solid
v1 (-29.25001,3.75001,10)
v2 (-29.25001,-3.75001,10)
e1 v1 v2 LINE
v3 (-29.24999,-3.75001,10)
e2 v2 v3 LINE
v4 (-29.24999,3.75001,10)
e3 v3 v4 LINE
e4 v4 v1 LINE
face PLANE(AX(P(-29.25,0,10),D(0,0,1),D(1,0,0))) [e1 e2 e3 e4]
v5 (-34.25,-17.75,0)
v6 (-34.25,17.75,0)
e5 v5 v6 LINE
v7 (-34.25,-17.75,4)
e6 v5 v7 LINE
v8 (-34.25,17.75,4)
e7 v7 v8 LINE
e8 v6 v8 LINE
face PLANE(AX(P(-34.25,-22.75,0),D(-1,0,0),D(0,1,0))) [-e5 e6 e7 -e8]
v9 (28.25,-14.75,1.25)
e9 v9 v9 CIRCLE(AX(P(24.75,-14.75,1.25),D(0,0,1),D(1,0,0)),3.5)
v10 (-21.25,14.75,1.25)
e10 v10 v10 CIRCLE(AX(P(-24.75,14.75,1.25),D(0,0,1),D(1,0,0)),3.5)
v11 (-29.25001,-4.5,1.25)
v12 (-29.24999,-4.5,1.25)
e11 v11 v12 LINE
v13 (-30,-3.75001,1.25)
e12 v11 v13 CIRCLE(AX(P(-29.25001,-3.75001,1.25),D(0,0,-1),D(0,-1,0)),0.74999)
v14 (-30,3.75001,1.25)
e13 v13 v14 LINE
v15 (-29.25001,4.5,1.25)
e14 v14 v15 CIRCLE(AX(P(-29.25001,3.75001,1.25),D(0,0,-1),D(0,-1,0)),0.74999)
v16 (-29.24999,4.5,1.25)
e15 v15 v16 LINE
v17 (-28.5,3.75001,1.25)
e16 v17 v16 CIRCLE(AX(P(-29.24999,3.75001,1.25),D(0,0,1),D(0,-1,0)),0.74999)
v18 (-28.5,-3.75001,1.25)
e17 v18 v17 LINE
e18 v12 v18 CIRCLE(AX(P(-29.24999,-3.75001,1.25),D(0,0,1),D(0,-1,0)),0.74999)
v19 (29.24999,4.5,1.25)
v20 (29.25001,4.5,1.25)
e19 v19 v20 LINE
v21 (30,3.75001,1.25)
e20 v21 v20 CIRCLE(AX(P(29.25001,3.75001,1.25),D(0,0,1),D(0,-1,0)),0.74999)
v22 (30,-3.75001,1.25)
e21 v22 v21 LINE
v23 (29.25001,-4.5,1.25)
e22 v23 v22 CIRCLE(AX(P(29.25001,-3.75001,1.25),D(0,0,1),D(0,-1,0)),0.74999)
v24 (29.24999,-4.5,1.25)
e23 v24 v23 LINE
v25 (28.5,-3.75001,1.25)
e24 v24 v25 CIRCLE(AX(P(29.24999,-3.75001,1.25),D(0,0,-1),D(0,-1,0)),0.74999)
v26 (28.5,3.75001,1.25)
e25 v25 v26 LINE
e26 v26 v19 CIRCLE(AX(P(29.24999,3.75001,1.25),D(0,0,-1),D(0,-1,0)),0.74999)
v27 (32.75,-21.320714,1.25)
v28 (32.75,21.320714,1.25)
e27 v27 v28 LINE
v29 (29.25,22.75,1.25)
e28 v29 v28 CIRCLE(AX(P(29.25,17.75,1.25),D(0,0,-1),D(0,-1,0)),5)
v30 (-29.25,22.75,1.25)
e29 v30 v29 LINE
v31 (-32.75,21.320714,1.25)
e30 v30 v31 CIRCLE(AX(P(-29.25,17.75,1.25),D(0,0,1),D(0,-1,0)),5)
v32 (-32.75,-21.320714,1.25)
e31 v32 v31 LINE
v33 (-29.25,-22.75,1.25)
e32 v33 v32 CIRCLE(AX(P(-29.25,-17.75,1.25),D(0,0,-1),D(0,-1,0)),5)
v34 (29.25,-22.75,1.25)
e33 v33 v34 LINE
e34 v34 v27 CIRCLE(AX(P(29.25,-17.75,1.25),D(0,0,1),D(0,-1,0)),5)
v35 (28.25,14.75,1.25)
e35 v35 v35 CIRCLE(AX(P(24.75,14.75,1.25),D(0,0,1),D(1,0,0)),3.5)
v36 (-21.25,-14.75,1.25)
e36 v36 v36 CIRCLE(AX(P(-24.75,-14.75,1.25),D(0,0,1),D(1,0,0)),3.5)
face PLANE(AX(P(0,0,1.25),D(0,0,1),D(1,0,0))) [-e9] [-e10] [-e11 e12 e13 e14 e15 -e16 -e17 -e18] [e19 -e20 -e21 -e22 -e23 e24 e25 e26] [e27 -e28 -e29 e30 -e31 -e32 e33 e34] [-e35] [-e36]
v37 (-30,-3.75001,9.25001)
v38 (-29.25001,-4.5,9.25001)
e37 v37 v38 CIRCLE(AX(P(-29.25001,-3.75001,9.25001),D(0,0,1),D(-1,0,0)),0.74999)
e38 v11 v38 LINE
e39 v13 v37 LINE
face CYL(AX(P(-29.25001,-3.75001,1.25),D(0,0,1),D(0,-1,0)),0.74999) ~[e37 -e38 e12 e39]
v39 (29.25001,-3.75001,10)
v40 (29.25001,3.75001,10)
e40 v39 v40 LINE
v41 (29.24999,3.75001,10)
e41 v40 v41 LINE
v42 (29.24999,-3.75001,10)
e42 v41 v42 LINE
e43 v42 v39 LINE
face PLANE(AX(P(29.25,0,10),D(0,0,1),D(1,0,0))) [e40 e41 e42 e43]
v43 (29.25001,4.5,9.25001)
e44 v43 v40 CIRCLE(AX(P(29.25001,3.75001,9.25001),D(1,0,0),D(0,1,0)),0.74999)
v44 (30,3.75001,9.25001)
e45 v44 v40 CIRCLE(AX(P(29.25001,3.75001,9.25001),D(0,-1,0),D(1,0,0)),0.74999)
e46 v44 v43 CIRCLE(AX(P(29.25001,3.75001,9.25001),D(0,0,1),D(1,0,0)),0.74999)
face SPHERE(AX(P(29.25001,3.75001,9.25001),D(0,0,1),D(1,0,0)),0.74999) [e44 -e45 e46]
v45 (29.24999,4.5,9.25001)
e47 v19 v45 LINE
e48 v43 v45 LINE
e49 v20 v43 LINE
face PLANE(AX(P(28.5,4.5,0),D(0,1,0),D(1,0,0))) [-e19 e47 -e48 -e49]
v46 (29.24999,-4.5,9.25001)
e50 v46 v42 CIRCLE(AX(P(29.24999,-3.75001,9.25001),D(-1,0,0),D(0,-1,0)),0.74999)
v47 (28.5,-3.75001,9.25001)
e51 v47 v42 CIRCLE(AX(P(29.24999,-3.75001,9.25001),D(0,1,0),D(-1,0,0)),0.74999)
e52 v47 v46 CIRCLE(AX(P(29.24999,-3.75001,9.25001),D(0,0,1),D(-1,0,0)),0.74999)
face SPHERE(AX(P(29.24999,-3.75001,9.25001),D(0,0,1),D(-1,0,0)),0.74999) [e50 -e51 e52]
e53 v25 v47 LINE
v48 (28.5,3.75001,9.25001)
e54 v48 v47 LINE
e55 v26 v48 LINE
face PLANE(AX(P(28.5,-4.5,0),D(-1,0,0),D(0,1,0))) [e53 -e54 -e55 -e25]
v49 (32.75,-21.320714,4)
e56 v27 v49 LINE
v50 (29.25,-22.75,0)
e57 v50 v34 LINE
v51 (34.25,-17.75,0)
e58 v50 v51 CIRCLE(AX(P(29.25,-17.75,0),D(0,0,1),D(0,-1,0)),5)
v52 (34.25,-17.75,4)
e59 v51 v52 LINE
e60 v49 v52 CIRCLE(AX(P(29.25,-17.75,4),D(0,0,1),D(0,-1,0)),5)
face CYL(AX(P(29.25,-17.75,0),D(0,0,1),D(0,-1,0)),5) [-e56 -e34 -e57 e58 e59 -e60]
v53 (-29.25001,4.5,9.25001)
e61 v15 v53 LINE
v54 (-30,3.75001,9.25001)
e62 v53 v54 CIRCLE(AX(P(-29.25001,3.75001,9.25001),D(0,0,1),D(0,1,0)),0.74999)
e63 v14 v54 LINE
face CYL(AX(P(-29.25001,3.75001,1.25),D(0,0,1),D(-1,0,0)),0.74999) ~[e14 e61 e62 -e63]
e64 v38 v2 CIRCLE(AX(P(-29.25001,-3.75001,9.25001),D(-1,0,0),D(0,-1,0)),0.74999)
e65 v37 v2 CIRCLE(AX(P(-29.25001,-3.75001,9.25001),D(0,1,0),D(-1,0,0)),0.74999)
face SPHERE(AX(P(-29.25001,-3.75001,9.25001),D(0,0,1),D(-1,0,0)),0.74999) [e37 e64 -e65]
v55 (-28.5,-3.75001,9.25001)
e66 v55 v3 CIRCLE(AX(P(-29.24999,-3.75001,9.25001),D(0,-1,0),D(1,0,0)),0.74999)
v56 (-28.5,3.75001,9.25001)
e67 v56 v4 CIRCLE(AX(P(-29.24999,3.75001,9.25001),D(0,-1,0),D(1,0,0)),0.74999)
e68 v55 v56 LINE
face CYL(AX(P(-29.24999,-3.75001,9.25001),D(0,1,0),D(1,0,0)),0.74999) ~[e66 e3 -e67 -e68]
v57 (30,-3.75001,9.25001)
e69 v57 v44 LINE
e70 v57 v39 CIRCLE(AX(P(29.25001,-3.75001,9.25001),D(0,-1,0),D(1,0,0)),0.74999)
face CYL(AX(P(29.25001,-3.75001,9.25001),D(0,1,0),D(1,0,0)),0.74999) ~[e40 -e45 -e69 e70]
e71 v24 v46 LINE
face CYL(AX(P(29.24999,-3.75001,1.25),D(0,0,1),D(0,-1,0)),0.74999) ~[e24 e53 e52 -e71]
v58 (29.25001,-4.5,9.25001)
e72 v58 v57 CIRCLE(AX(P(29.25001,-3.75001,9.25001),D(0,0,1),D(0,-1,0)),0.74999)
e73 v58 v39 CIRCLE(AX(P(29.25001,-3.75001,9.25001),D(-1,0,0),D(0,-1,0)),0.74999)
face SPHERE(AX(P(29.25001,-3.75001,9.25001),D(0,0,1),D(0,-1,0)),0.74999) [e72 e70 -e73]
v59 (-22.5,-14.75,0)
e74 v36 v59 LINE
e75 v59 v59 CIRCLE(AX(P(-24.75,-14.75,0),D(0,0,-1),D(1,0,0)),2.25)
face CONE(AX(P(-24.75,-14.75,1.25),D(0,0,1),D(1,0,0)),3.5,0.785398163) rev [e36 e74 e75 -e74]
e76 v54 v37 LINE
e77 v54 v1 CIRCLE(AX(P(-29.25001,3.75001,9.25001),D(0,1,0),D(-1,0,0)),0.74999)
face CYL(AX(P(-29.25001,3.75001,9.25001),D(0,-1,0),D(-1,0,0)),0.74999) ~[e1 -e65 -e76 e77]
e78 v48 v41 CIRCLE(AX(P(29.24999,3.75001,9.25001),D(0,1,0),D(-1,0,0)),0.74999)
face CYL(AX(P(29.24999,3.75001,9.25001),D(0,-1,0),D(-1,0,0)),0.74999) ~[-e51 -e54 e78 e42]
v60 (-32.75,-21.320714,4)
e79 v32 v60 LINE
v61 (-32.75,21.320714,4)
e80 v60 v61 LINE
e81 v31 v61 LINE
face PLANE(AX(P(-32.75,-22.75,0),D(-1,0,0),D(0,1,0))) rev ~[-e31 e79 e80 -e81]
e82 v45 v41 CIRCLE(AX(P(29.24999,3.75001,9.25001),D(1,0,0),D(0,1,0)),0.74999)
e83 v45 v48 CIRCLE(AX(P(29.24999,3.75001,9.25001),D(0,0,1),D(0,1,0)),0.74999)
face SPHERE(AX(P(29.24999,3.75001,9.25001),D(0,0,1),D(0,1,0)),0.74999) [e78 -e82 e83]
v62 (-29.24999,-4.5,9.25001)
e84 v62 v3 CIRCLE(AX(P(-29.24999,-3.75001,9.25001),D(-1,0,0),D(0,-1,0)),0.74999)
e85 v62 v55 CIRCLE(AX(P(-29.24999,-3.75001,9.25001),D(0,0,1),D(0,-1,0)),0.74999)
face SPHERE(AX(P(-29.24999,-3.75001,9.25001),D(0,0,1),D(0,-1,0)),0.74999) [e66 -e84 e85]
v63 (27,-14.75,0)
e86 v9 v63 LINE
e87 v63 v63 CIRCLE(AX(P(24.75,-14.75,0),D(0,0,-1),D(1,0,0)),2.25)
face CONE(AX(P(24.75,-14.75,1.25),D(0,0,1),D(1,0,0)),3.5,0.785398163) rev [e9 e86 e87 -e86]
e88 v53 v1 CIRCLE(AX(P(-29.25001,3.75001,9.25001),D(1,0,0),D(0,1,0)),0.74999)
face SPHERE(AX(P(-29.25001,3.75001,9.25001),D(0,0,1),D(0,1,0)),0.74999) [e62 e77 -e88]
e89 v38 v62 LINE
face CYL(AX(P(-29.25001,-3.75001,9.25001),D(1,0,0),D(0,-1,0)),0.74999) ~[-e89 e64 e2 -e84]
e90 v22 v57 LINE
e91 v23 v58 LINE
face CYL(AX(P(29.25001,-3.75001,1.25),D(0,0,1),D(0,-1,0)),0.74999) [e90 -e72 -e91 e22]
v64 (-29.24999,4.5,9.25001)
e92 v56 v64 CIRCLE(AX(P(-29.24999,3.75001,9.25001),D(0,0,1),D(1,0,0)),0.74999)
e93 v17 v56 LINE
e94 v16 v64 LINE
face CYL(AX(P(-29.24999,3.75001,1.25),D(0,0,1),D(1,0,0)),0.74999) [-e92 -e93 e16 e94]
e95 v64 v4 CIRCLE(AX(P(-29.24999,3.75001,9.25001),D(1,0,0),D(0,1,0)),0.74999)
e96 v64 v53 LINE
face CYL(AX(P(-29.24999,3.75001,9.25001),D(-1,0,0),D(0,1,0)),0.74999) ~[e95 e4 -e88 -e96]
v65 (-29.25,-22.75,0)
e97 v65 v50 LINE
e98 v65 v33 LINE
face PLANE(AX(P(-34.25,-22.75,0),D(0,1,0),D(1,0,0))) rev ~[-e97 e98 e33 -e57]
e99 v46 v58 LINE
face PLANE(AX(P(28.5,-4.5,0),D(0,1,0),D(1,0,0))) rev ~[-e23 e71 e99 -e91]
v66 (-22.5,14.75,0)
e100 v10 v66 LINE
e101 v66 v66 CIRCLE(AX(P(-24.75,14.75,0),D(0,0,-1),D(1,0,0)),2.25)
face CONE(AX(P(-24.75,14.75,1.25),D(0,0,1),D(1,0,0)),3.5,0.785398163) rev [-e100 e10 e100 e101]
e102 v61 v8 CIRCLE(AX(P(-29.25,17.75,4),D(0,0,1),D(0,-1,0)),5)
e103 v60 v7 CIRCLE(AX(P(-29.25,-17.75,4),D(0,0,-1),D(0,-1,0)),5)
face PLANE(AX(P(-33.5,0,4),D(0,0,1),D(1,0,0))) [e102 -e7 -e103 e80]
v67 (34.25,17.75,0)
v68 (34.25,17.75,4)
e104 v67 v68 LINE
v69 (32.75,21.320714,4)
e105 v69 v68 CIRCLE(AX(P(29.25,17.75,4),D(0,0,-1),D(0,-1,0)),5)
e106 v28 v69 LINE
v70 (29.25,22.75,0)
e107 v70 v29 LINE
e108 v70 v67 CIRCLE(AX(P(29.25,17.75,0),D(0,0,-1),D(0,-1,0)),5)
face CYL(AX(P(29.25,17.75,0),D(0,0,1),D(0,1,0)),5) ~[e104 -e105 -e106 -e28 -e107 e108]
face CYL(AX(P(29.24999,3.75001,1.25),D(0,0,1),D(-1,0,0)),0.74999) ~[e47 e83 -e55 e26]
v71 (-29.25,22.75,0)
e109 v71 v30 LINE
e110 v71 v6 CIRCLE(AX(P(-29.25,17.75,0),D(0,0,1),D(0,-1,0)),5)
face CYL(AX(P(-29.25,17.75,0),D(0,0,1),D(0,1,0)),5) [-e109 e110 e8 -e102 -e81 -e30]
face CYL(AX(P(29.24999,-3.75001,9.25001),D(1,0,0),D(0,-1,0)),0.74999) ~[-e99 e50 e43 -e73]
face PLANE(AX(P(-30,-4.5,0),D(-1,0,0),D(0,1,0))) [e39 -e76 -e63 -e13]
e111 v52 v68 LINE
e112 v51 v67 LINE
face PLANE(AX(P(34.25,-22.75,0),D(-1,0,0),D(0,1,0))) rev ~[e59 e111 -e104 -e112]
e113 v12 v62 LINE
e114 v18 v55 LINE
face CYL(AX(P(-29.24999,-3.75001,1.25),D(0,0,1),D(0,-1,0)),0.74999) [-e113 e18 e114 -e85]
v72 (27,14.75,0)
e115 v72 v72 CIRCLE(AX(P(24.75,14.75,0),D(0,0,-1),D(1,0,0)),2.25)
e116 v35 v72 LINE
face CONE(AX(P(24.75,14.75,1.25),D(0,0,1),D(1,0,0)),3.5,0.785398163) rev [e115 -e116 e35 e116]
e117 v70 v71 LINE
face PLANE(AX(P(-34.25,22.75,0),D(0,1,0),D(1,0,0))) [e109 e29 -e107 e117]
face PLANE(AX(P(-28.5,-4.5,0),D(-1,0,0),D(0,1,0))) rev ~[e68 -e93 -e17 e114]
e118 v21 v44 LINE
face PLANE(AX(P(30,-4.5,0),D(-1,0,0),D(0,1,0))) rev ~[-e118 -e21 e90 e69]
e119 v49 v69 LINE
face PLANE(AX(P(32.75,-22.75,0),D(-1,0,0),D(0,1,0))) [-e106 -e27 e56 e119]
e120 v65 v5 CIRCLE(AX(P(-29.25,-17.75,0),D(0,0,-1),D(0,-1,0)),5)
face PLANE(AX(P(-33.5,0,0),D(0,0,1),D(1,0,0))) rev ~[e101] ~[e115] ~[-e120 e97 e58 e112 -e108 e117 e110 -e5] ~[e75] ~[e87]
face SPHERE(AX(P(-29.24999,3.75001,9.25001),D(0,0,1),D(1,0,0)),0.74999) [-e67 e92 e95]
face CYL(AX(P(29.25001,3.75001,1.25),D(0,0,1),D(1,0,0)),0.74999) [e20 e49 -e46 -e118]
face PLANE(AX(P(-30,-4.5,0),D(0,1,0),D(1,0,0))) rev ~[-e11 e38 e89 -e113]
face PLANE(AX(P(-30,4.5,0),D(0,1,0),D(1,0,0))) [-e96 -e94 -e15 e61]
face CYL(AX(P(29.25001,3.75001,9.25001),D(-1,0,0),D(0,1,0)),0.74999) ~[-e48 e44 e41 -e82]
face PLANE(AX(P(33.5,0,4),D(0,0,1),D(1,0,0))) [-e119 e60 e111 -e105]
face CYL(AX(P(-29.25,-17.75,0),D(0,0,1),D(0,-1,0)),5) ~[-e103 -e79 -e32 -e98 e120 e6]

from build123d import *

# Parameters (mm, degrees)
F0_W     = 65.5
F0_H     = 45.5
F0_R     = 1.5
F0_W_2   = 1.5
F0_H_2   = 9
F1_DEPTH = 1.25
F2_DEPTH = 10
F3_DEPTH = 4
F5_R     = 0.74999
F6_R     = 0.74999
F7_R     = 5


# Not quite as in the source:
# - a fillet or chamfer that OpenCascade refuses, or shapes differently, is made with other operations: its cross-section is extruded or revolved along the edge and cut away or added
# - a fillet or chamfer is up to 0.001 mm smaller than in the source, because OpenCascade refuses the exact size


with BuildPart() as f1:
    # F0 (on Top) → F1 (new body)
    with BuildSketch(Plane.XY):
        Rectangle(F0_W, F0_H)
        with Locations((-24.75, -14.75)):
            Circle(F0_R, mode=Mode.SUBTRACT)
        with Locations((24.75, -14.75)):
            Circle(F0_R, mode=Mode.SUBTRACT)
        with Locations((-29.25, 0)):
            Rectangle(F0_W_2, F0_H_2, mode=Mode.SUBTRACT)
        with Locations((-24.75, 14.75)):
            Circle(F0_R, mode=Mode.SUBTRACT)
        with Locations((29.25, 0)):
            Rectangle(F0_W_2, F0_H_2, mode=Mode.SUBTRACT)
        with Locations((24.75, 14.75)):
            Circle(F0_R, mode=Mode.SUBTRACT)
    extrude(amount=F1_DEPTH)

    # F0 (on Top) → F2 (join)
    with BuildSketch(Plane.XY):
        with Locations((-29.25, 0)):
            Rectangle(F0_W_2, F0_H_2)
        with Locations((29.25, 0)):
            Rectangle(F0_W_2, F0_H_2)
    extrude(amount=F2_DEPTH)

    # F0 (on Top) → F3 (join)
    with BuildSketch(Plane.XY):
        with Locations((-33.5, 0)):
            Rectangle(F0_W_2, F0_H)
        with Locations((33.5, 0)):
            Rectangle(F0_W_2, F0_H)
    extrude(amount=F3_DEPTH)

    # F4: chamfer of 2 on 4 edges, made by hand

    # F4_s1 → F4_t2 (revolve, cut)
    with BuildSketch(Plane.XZ.offset(-14.75)):
        Polygon((-21.25, 1.25), (-23.25, -0.75), (-23.25, 1.25), align=None)
    revolve(axis=Axis((-24.75, 14.75, 1.25), (0, 0, 1)), mode=Mode.SUBTRACT)

    # F4_s3 → F4_t4 (revolve, cut)
    with BuildSketch(Plane.XZ.offset(14.75)):
        Polygon((-21.25, 1.25), (-23.25, -0.75), (-23.25, 1.25), align=None)
    revolve(axis=Axis((-24.75, -14.75, 1.25), (0, 0, 1)), mode=Mode.SUBTRACT)

    # F4_s5 → F4_t6 (revolve, cut)
    with BuildSketch(Plane.XZ.offset(-14.75)):
        Polygon((28.25, 1.25), (26.25, -0.75), (26.25, 1.25), align=None)
    revolve(axis=Axis((24.75, 14.75, 1.25), (0, 0, 1)), mode=Mode.SUBTRACT)

    # F4_s7 → F4_t8 (revolve, cut)
    with BuildSketch(Plane.XZ.offset(14.75)):
        Polygon((28.25, 1.25), (26.25, -0.75), (26.25, 1.25), align=None)
    revolve(axis=Axis((24.75, -14.75, 1.25), (0, 0, 1)), mode=Mode.SUBTRACT)

    # F5 (radius 0.75 in the source; OpenCascade refuses exactly that, so slightly less here)
    f5_edges = [f1.edges().sort_by_distance(p)[0] for p in [
        (-30, 4.5, 5.625),
        (30, 4.5, 5.625),
        (28.5, 4.5, 5.625),
        (-30, -4.5, 5.625),
        (-28.5, -4.5, 5.625),
        (28.5, -4.5, 5.625),
        (30, -4.5, 5.625),
        (-28.5, 4.5, 5.625),
    ]]
    fillet(f5_edges, radius=F5_R)

    # F6 (radius 0.75 in the source; OpenCascade refuses exactly that, so slightly less here)
    f6_edges = [f1.edges().sort_by_distance(p)[0] for p in [
        (-29.25, -4.5, 10),
        (-29.780333, -4.280333, 10),
        (-28.719667, -4.280333, 10),
        (-30, 0, 10),
        (-28.5, 0, 10),
        (-29.780333, 4.280333, 10),
        (-28.719667, 4.280333, 10),
        (-29.25, 4.5, 10),
        (29.25, -4.5, 10),
        (28.719667, -4.280333, 10),
        (29.780333, -4.280333, 10),
        (28.5, 0, 10),
        (30, 0, 10),
        (28.719667, 4.280333, 10),
        (29.780333, 4.280333, 10),
        (29.25, 4.5, 10),
    ]]
    fillet(f6_edges, radius=F6_R)

    # F7
    f7_edges = [f1.edges().sort_by_distance(p)[0] for p in [
        (-34.25, -22.75, 2),
        (34.25, -22.75, 2),
        (34.25, 22.75, 2),
        (-34.25, 22.75, 2),
    ]]
    fillet(f7_edges, radius=F7_R)


solid = f1.part
